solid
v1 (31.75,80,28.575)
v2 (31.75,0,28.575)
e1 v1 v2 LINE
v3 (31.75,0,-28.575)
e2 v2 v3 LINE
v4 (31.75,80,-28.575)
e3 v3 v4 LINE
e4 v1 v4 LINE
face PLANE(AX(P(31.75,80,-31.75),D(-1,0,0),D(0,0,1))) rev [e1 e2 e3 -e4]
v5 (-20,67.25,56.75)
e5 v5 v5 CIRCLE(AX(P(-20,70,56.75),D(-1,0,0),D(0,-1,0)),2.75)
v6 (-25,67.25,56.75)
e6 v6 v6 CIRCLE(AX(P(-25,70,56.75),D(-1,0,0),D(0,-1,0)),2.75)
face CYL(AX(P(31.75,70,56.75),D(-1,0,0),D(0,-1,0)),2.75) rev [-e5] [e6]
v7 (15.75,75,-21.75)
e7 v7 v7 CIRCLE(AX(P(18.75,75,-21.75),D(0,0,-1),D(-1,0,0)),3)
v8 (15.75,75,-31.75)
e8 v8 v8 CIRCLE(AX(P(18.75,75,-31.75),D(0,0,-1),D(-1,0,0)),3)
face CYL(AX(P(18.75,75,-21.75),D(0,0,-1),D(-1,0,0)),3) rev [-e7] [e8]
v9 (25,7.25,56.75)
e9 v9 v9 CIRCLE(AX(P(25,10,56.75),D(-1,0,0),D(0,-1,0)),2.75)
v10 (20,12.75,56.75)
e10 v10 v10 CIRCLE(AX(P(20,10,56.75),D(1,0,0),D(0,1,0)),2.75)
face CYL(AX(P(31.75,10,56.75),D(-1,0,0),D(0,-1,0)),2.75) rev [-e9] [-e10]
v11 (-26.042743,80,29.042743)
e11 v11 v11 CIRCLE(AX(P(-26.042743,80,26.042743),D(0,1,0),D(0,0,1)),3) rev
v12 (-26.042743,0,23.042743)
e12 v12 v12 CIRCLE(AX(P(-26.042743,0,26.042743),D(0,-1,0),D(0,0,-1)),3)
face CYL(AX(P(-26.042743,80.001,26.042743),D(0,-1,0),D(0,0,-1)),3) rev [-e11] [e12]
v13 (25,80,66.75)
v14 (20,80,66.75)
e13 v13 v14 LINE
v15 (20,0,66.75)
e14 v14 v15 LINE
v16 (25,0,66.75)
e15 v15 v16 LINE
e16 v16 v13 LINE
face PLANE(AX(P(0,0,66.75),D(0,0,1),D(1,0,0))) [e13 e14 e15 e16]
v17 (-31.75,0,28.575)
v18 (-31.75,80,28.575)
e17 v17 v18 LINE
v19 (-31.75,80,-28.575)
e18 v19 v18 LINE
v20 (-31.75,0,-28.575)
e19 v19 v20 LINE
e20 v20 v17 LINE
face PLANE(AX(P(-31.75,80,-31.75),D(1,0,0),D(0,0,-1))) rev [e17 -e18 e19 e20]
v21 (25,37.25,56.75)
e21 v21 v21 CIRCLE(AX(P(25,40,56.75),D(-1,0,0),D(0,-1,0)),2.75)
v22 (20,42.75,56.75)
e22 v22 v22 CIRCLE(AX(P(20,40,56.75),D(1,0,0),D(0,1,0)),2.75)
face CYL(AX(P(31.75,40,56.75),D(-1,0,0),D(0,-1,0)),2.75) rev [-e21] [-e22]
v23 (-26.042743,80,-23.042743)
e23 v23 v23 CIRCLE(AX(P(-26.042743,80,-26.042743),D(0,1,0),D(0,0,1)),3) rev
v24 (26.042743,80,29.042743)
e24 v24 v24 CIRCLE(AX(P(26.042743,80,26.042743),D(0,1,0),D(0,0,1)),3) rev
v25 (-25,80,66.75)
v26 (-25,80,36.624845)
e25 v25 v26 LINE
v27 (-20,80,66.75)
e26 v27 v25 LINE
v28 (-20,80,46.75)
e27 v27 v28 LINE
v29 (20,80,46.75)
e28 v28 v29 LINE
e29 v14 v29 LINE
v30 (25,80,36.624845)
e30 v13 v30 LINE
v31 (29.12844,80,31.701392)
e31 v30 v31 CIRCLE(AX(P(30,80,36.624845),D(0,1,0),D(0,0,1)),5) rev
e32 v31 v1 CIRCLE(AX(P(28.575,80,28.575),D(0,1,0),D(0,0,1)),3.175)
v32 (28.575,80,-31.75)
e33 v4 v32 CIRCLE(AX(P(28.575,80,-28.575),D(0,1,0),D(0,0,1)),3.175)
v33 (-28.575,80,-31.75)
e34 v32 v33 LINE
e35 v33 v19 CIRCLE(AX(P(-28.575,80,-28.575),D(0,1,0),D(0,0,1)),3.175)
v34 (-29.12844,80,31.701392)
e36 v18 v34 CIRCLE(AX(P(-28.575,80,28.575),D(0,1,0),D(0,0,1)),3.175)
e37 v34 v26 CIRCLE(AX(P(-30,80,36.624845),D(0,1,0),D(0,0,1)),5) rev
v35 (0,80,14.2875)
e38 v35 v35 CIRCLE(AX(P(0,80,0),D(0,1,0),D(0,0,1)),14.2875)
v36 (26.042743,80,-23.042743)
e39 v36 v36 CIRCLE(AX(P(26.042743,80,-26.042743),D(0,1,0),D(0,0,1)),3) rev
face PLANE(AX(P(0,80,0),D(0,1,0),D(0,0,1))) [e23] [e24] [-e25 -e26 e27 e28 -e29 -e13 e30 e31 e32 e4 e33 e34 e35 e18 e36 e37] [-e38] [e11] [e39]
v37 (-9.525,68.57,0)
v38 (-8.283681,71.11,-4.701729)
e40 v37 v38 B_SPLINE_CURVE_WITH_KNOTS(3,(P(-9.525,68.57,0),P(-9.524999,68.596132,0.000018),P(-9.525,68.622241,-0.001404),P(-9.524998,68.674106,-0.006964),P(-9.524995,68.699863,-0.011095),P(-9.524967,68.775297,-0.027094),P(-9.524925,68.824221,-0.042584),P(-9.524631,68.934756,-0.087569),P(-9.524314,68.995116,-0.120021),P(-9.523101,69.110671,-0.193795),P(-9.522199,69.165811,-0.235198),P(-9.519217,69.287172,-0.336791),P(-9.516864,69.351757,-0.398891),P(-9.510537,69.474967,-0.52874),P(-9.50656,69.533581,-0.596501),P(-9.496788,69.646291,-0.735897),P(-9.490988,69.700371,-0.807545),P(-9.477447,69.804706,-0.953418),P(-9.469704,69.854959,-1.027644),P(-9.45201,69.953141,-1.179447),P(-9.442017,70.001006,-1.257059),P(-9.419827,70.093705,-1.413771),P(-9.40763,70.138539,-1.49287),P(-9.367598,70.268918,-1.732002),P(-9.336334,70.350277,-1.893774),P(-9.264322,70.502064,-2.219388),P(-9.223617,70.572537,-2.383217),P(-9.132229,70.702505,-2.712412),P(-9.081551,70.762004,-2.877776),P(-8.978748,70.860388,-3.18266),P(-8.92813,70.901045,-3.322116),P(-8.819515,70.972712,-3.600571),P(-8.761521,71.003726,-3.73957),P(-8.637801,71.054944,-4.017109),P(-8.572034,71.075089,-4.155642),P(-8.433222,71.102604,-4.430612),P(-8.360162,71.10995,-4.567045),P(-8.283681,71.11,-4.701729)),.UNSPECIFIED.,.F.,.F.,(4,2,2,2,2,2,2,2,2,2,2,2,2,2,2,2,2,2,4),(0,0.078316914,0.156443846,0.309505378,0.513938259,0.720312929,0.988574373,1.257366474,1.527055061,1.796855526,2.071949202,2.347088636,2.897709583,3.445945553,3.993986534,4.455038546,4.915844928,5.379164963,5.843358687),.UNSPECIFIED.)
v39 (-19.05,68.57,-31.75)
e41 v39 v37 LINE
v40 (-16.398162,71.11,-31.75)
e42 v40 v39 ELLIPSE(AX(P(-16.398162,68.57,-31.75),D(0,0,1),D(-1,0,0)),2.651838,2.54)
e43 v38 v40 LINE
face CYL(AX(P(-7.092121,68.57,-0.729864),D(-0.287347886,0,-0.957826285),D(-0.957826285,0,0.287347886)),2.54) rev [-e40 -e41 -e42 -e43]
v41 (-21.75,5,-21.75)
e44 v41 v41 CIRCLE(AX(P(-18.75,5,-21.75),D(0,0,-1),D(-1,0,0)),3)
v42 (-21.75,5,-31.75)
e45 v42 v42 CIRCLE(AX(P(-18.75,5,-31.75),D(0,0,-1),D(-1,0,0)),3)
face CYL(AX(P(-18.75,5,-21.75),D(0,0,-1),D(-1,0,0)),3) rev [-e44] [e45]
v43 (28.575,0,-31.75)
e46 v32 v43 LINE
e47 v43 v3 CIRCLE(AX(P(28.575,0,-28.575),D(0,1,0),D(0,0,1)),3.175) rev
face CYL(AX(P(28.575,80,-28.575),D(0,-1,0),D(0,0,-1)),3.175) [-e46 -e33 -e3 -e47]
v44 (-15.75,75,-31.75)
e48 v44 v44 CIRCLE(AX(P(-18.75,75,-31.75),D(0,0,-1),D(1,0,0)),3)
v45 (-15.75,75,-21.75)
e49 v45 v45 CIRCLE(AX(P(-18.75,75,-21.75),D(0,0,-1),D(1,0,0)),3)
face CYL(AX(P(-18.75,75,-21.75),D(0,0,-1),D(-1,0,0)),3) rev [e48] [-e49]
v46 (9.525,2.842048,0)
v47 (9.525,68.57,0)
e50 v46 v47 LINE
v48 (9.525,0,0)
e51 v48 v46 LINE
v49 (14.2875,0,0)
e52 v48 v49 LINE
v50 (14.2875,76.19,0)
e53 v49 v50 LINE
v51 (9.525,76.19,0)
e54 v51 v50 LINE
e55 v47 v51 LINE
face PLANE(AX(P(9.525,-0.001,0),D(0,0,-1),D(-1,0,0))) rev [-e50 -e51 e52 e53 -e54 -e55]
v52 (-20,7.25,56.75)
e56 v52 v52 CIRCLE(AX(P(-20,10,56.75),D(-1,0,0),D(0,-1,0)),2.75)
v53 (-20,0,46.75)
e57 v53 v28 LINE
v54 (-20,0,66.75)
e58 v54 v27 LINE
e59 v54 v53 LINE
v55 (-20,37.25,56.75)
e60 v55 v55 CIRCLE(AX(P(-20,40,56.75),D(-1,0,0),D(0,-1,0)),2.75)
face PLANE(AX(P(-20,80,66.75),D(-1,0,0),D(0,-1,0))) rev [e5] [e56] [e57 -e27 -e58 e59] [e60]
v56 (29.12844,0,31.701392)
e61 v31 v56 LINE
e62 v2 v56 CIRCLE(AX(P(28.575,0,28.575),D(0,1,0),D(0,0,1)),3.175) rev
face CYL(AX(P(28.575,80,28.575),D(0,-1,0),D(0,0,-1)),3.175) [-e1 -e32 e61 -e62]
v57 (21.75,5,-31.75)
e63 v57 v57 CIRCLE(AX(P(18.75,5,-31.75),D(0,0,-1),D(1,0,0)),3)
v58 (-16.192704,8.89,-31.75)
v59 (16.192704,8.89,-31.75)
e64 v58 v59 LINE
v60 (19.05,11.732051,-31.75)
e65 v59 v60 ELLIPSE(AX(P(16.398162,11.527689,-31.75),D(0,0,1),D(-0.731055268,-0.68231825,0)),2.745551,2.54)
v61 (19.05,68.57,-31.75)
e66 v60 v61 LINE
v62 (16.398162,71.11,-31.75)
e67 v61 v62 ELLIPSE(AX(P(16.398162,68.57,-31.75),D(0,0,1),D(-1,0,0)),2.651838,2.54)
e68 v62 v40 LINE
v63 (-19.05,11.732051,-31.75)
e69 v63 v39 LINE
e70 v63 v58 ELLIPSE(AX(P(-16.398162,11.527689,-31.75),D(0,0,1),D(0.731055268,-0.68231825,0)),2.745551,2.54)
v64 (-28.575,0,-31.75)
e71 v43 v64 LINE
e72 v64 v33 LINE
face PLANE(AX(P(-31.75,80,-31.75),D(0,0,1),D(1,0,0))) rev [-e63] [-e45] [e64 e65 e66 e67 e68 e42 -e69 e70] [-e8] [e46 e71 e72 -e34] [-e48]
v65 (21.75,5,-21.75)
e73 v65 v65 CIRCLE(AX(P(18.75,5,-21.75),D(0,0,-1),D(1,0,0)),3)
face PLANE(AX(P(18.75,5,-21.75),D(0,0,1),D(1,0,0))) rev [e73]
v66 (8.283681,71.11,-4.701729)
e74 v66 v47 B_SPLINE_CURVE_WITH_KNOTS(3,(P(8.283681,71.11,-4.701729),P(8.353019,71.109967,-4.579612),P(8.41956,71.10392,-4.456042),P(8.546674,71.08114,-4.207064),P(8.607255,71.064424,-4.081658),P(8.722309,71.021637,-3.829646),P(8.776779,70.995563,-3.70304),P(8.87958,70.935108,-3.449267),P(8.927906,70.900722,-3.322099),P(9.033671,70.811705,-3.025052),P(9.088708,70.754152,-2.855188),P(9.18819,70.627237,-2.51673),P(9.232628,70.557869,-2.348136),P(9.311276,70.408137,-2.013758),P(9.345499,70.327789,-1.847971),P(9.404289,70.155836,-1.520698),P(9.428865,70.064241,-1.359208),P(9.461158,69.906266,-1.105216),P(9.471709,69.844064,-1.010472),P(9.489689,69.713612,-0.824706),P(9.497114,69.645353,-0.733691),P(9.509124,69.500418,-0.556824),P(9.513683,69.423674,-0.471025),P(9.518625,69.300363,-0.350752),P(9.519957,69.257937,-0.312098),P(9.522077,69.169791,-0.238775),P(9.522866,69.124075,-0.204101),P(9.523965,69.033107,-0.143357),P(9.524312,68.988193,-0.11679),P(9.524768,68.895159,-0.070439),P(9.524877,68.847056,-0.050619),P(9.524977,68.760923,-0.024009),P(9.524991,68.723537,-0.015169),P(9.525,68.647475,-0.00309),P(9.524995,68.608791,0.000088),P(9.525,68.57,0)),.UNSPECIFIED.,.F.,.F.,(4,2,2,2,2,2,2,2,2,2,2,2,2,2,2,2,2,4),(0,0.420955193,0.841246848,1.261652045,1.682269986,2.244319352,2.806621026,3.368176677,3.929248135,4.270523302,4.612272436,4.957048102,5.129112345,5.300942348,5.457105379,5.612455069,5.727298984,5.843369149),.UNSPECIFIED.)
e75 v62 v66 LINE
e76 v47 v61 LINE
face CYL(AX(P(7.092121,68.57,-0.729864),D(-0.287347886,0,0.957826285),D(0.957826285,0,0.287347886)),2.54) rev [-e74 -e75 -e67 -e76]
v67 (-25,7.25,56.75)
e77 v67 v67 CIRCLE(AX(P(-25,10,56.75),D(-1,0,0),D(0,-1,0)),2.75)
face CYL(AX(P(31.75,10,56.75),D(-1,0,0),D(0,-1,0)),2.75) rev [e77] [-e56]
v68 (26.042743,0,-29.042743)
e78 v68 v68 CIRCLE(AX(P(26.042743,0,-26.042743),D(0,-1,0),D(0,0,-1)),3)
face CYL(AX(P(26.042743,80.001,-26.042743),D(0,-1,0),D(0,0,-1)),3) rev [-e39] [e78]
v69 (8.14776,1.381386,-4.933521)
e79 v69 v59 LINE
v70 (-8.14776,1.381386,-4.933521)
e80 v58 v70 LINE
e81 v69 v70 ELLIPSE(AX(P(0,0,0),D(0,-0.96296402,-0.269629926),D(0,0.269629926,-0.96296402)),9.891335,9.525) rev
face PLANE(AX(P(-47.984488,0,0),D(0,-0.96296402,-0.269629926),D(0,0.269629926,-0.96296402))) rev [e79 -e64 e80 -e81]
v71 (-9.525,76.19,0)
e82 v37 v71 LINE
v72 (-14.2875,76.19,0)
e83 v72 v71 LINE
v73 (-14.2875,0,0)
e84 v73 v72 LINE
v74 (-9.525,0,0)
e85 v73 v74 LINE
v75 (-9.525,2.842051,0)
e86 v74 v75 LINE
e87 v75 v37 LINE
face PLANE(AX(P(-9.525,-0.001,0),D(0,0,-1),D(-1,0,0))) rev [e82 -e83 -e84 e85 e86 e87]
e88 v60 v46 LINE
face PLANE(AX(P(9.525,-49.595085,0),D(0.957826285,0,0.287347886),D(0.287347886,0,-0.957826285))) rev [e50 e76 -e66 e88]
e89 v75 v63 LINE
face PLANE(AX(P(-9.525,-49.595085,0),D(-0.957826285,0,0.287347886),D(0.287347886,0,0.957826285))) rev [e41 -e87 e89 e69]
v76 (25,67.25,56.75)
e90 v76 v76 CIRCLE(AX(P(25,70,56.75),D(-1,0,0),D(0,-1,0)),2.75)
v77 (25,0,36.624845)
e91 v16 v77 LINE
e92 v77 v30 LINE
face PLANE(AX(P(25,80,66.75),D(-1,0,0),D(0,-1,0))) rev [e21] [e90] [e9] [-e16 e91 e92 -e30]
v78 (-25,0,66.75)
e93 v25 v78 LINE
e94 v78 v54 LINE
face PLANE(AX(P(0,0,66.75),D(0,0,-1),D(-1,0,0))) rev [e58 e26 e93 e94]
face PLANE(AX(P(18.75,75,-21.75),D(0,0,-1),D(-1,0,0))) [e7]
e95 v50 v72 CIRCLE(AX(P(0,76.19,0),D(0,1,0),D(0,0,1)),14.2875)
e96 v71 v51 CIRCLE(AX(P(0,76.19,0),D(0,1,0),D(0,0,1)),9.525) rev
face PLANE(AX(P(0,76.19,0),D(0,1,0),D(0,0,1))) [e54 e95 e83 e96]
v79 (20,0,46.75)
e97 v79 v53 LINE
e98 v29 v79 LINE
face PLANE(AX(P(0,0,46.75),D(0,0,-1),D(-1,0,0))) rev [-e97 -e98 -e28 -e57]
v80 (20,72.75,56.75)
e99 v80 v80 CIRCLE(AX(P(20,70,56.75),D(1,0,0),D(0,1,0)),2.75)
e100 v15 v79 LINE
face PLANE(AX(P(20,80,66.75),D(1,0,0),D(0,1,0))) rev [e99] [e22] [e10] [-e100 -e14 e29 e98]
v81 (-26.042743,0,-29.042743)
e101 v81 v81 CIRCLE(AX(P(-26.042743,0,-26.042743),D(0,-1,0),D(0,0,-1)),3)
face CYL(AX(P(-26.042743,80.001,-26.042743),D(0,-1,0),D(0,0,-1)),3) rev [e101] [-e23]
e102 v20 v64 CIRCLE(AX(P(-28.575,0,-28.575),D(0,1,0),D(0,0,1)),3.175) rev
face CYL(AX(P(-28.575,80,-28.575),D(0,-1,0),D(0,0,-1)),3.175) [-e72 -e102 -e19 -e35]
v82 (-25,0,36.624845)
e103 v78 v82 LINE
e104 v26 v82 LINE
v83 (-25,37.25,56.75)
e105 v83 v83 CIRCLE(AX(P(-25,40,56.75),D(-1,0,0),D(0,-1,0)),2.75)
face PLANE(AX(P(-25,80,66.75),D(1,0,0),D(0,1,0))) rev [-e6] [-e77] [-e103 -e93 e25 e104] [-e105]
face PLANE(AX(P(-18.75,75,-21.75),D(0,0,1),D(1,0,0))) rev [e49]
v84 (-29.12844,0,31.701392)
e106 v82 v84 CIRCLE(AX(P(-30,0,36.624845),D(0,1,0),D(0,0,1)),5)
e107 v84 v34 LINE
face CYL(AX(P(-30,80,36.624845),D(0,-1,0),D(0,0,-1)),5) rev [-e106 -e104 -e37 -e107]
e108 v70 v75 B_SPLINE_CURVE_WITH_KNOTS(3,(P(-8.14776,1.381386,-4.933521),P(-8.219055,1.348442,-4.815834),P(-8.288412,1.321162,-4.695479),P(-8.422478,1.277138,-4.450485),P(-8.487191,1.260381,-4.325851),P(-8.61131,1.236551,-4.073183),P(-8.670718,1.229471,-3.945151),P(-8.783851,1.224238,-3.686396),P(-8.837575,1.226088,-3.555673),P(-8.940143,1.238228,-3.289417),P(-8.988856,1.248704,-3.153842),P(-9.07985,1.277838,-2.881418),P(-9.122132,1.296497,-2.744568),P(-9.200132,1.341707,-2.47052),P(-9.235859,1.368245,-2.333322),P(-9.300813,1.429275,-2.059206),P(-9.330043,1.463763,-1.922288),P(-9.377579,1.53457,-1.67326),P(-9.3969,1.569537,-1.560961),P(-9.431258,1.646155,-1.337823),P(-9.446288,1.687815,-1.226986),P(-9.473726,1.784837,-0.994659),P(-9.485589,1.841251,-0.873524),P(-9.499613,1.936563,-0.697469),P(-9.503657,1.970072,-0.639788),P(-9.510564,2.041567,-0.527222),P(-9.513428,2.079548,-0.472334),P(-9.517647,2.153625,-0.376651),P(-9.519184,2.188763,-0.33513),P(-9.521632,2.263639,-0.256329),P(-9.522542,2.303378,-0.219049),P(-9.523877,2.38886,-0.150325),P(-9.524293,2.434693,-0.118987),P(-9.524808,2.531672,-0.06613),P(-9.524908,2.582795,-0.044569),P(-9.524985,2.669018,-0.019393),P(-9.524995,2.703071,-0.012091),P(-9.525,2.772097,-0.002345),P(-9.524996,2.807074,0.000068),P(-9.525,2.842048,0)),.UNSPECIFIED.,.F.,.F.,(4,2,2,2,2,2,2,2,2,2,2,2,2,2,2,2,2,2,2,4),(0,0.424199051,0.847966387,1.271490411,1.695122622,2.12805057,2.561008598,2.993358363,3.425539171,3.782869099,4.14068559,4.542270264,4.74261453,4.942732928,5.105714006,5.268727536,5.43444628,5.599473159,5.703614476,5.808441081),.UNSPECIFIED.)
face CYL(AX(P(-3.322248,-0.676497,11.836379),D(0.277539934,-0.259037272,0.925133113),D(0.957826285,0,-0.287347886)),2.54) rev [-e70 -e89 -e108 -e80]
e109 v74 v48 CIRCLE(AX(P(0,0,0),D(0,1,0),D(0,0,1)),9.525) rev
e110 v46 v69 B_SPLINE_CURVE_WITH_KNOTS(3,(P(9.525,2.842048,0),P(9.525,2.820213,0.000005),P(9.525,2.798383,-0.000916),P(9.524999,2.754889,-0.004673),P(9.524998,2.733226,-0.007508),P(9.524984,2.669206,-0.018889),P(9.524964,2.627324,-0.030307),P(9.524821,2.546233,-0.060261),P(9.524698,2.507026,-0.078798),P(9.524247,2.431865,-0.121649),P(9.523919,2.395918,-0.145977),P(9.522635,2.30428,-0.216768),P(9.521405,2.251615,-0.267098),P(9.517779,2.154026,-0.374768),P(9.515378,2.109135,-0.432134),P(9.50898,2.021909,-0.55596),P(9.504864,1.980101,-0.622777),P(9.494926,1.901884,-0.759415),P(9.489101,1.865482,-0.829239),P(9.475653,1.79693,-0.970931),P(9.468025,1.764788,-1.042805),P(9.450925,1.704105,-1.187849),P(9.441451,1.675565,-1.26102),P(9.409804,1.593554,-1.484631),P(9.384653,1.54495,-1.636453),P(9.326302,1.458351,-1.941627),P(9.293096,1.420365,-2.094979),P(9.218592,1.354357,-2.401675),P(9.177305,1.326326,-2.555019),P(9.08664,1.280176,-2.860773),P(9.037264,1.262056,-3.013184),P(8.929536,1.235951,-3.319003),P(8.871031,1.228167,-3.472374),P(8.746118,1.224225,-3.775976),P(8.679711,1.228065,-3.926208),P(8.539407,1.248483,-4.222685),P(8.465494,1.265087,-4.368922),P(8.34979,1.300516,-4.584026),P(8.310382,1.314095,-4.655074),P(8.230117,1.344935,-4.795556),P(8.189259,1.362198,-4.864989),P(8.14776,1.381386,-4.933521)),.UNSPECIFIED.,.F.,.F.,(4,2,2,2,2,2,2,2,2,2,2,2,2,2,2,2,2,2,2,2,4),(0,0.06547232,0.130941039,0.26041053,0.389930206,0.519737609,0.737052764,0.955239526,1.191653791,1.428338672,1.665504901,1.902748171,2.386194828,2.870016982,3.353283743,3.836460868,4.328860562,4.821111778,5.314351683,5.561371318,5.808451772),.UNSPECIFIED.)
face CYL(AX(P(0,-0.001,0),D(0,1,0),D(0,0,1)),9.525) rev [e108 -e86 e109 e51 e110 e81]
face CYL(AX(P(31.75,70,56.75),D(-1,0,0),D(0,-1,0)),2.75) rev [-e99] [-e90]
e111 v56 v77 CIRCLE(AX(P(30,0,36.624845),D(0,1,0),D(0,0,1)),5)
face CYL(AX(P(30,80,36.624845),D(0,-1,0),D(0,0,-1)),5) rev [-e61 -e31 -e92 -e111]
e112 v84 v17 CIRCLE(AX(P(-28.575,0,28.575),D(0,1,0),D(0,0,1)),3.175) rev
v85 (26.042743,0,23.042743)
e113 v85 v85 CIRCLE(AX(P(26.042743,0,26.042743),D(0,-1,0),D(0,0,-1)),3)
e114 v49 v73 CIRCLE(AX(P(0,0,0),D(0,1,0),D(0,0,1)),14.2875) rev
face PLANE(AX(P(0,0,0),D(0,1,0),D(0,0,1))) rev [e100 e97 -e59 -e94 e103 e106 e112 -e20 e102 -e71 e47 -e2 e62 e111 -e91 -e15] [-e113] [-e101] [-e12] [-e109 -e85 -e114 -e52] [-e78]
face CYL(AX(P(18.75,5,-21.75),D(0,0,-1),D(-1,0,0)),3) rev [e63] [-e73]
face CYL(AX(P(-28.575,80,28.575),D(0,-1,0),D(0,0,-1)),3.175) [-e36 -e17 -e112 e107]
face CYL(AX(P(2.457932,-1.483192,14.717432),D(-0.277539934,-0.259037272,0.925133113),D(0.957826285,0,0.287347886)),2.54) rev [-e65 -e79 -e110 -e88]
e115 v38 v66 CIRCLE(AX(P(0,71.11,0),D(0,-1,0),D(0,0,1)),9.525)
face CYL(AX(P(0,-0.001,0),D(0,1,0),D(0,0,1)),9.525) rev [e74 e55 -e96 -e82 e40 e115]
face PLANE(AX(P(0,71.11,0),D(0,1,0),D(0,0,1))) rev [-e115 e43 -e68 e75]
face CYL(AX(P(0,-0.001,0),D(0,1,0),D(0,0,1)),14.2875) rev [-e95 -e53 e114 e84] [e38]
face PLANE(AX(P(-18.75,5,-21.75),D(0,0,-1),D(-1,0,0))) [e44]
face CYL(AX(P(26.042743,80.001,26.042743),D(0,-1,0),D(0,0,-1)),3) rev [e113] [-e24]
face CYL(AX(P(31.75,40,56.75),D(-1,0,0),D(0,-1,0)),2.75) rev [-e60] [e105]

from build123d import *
from build123d.topology import SkipClean

# Parameters (mm, degrees)
SKETCH2_W                      = 63.5
SKETCH2_H                      = 63.5
BOSS_EXTRUDE1_DEPTH            = 80
CUT_EXTRUDE1_REACH             = 93.739
SKETCH4_R                      = 14.2875
CUT_EXTRUDE2_DEPTH             = 3.81
CUT_EXTRUDE3_DEPTH             = 62.22
CUT_EXTRUDE4_REACH             = 93.739
CUT_EXTRUDE4_DIRECTION_2_REACH = 93.739
FILLET2_R                      = 2.54
SKETCH9_W                      = 5
SKETCH9_H                      = 80
BOSS_EXTRUDE2_DEPTH            = 35
SKETCH10_R                     = 2.75
CUT_EXTRUDE6_DEPTH             = 119.642846392
CUT_EXTRUDE7_REACH             = 110.92
SKETCH11_R                     = 3
SKETCH12_W                     = 40
SKETCH12_H                     = 80
BOSS_EXTRUDE3_DEPTH            = 15
SKETCH13_R                     = 3
CUT_EXTRUDE8_DEPTH             = 10
FILLET3_R                      = 3.175
FILLET4_DEPTH                  = 80


with BuildPart() as part:
    # Sketch2 → Boss-Extrude1 (new body)
    with BuildSketch(Plane(origin=(0, 0, 0), x_dir=(1, 0, 0), z_dir=(0, 1, 0))):
        Rectangle(SKETCH2_W, SKETCH2_H)
    extrude(amount=BOSS_EXTRUDE1_DEPTH)

    # Sketch3 → Cut-Extrude1 (cut, up to next)
    with BuildSketch(Plane(origin=(0, 80, 0), x_dir=(1, 0, 0), z_dir=(0, 1, 0)), mode=Mode.PRIVATE) as cut_extrude1_sk1:
        with BuildLine():
            Line((9.525, 0), (14.2875, 0))
            ThreePointArc((14.2875, 0), (0, -14.2875), (-14.2875, 0))
            Line((-14.2875, 0), (-9.525, 0))
            ThreePointArc((-9.525, 0), (0, 9.525), (9.525, 0))
        make_face()
    cut_extrude1_tool1 = extrude(cut_extrude1_sk1.sketch, amount=-CUT_EXTRUDE1_REACH, mode=Mode.PRIVATE) & part.part
    add(cut_extrude1_tool1.solids().sort_by_distance((0, 80, 2.954161))[0], mode=Mode.SUBTRACT)

    # Sketch4 → Cut-Extrude2 (cut)
    with BuildSketch(Plane(origin=(0, 80, 0), x_dir=(1, 0, 0), z_dir=(0, 1, 0))):
        with Locations(Location((0, 0, 0), (0, 0, 270))):
            Circle(SKETCH4_R)
    extrude(amount=-CUT_EXTRUDE2_DEPTH, mode=Mode.SUBTRACT)

    # Sketch6 → Cut-Extrude3 (cut)
    with BuildSketch(Plane(origin=(0, 71.11, 0), x_dir=(1, 0, 0), z_dir=(0, 1, 0))):
        with BuildLine():
            Line((9.525, 0), (19.05, 31.75))
            Line((19.05, 31.75), (-19.05, 31.75))
            Line((-19.05, 31.75), (-9.525, 0))
            ThreePointArc((-9.525, 0), (0, 9.525), (9.525, 0))
        make_face()
    extrude(amount=-CUT_EXTRUDE3_DEPTH, mode=Mode.SUBTRACT)

    # Cut-Extrude4: up to this plane
    with SkipClean():  # the faces are left unmerged after this step: merging them gives an invalid solid
        cut_extrude4_end = Plane(origin=(-9.525, -49.595085442, 0), z_dir=(-0.9578262852211514, 0, 0.2873478855663456))
        # Sketch7 → Cut-Extrude4 (cut, up to the surface)
        with BuildSketch(Plane(origin=(0, 0, 0), x_dir=(0, 0, -1), z_dir=(1, 0, 0)), mode=Mode.PRIVATE) as cut_extrude4_sk1:
            Polygon((0, 8.89), (31.75, 8.89), (0, 0), align=None)
        cut_extrude4_tool1 = split(extrude(cut_extrude4_sk1.sketch, amount=-CUT_EXTRUDE4_REACH, mode=Mode.PRIVATE), bisect_by=cut_extrude4_end, keep=Keep.BOTH, mode=Mode.PRIVATE)
        add(cut_extrude4_tool1.solids().sort_by_distance((0, 5.926667, -10.583333))[0], mode=Mode.SUBTRACT)

    # Cut-Extrude4 direction 2: up to this plane
    cut_extrude4_direction_2_end = Plane(origin=(9.525, -49.595085442, 0), z_dir=(0.9578262852211514, 0, 0.2873478855663456))
    # Sketch7 → Cut-Extrude4 direction 2 (cut, up to the surface)
    with BuildSketch(Plane(origin=(0, 0, 0), x_dir=(0, 0, -1), z_dir=(1, 0, 0)), mode=Mode.PRIVATE) as cut_extrude4_direction_2_sk1:
        Polygon((0, 8.89), (31.75, 8.89), (0, 0), align=None)
    cut_extrude4_direction_2_tool1 = split(extrude(cut_extrude4_direction_2_sk1.sketch, amount=CUT_EXTRUDE4_DIRECTION_2_REACH, mode=Mode.PRIVATE), bisect_by=cut_extrude4_direction_2_end, keep=Keep.BOTH, mode=Mode.PRIVATE)
    add(cut_extrude4_direction_2_tool1.solids().sort_by_distance((0, 5.926667, -10.583333))[0], mode=Mode.SUBTRACT)

    # Fillet2
    # the kernel refuses this fillet: 2.54 mm, written as the material it adds along each edge
    with BuildSketch(Plane(origin=(7.700340927, 71.11, 6.082196911), x_dir=(-0.9578262852211513, 0, -0.2873478855663455), z_dir=(0.28734788556634555, 0, -0.9578262852211513))) as fillet2_piece_1_section:
        with BuildLine():
            CenterArc((FILLET2_R, -FILLET2_R), FILLET2_R, 90, 90)
            Line((0, -FILLET2_R), (0, 0))
            Line((0, 0), (FILLET2_R, 0))
        make_face()
    fillet2_piece_1 = extrude(amount=45.847973166, mode=Mode.PRIVATE)
    fillet2_piece_1 = split(fillet2_piece_1, bisect_by=Plane(origin=(7.700340927, 71.11, -31.75), z_dir=(0, 0, 1)), keep=Keep.TOP, mode=Mode.PRIVATE)
    fillet2_piece_1 = fillet2_piece_1 - Plane(origin=(0, 71.11, 0), x_dir=(-1, 0, 0), z_dir=(0, 1, 0)) * Cylinder(9.525, 102, mode=Mode.PRIVATE)
    fillet2_piece_1 = split(fillet2_piece_1, bisect_by=Plane(origin=(7.700340927, 71.11, 0), z_dir=(0, 0, -1)), keep=Keep.TOP, mode=Mode.PRIVATE)
    add(fillet2_piece_1)
    with BuildSketch(Plane(origin=(-20.874659073, 71.11, -37.832196911), x_dir=(0, -1, 0), z_dir=(0.28734788556634555, 0, 0.9578262852211513))) as fillet2_piece_2_section:
        with BuildLine():
            CenterArc((FILLET2_R, FILLET2_R), FILLET2_R, 180, 90)
            Line((0, FILLET2_R), (0, 0))
            Line((0, 0), (FILLET2_R, 0))
        make_face()
    fillet2_piece_2 = extrude(amount=45.847973166, mode=Mode.PRIVATE)
    fillet2_piece_2 = split(fillet2_piece_2, bisect_by=Plane(origin=(-20.874659073, 71.11, -31.75), z_dir=(0, 0, 1)), keep=Keep.TOP, mode=Mode.PRIVATE)
    fillet2_piece_2 = split(fillet2_piece_2, bisect_by=Plane(origin=(-20.874659073, 71.11, 0), z_dir=(0, 0, -1)), keep=Keep.TOP, mode=Mode.PRIVATE)
    fillet2_piece_2 = fillet2_piece_2 - Plane(origin=(0, 71.11, 0), x_dir=(-1, 0, 0), z_dir=(0, 1, 0)) * Cylinder(9.525, 102, mode=Mode.PRIVATE)
    add(fillet2_piece_2)
    with BuildSketch(Plane(origin=(-20.954648619, 10.667672044, -38.098828729), x_dir=(0.9607141016314922, 0.07483307171461691, -0.2672609704093551), z_dir=(0.2775399339309484, -0.2590372716688848, 0.9251331131031606))) as fillet2_piece_3_section:
        with BuildLine():
            CenterArc((FILLET2_R * 1.08072615035, FILLET2_R), FILLET2_R, 175.556407911, 94.443592089)
            Line((FILLET2_R * 0.0837320564804, FILLET2_R * 1.07747758898), (0, 0))
            Line((0, 0), (FILLET2_R * 1.08072615035, 0))
        make_face()
    fillet2_piece_3 = extrude(amount=52.848435405, mode=Mode.PRIVATE)
    fillet2_piece_3 = split(fillet2_piece_3, bisect_by=Plane(origin=(-20.954648619, 10.667672044, -31.75), z_dir=(0, 0, 1)), keep=Keep.TOP, mode=Mode.PRIVATE)
    fillet2_piece_3 = fillet2_piece_3 - Plane(origin=(0, 10.667672044, 0), x_dir=(-1, 0, 0), z_dir=(0, 1, 0)) * Cylinder(9.525, 117, mode=Mode.PRIVATE)
    fillet2_piece_3 = split(fillet2_piece_3, bisect_by=Plane(origin=(-20.954648619, 10.667672044, 0), z_dir=(0, 0, -1)), keep=Keep.TOP, mode=Mode.PRIVATE)
    add(fillet2_piece_3)
    with BuildSketch(Plane(origin=(20.954648619, 10.667672044, -38.098828729), x_dir=(-0.9607141016314922, 0.07483307171461691, -0.2672609704093551), z_dir=(-0.2775399339309484, -0.2590372716688848, 0.9251331131031606))) as fillet2_piece_4_section:
        with BuildLine():
            CenterArc((FILLET2_R * 1.08072615035, -FILLET2_R), FILLET2_R, 90, 94.443592089)
            Line((FILLET2_R * 0.0837320564804, -FILLET2_R * 1.07747758898), (0, 0))
            Line((0, 0), (FILLET2_R * 1.08072615035, 0))
        make_face()
    fillet2_piece_4 = extrude(amount=52.848435405, mode=Mode.PRIVATE)
    fillet2_piece_4 = split(fillet2_piece_4, bisect_by=Plane(origin=(20.954648619, 10.667672044, -31.75), z_dir=(0, 0, 1)), keep=Keep.TOP, mode=Mode.PRIVATE)
    fillet2_piece_4 = fillet2_piece_4 - Plane(origin=(0, 10.667672044, 0), x_dir=(-1, 0, 0), z_dir=(0, 1, 0)) * Cylinder(9.525, 117, mode=Mode.PRIVATE)
    fillet2_piece_4 = split(fillet2_piece_4, bisect_by=Plane(origin=(20.954648619, 10.667672044, 0), z_dir=(0, 0, -1)), keep=Keep.TOP, mode=Mode.PRIVATE)
    add(fillet2_piece_4)

    # Sketch9 → Boss-Extrude2 (add)
    with BuildSketch(Plane.XY.offset(31.75)):
        with Locations((-22.5, 40)):
            Rectangle(SKETCH9_W, SKETCH9_H)
        with Locations((22.5, 40)):
            Rectangle(SKETCH9_W, SKETCH9_H)
    extrude(amount=BOSS_EXTRUDE2_DEPTH)

    # Sketch10 → Cut-Extrude6 (cut, through all)
    with BuildSketch(Plane.ZY.offset(25)):
        with Locations(Location((56.75, 70, 0), (0, 0, 270))):
            Circle(SKETCH10_R)
        with Locations(Location((56.75, 10, 0), (0, 0, 270))):
            Circle(SKETCH10_R)
        with Locations(Location((56.75, 40, 0), (0, 0, 270))):
            Circle(SKETCH10_R)
    extrude(amount=-CUT_EXTRUDE6_DEPTH, mode=Mode.SUBTRACT)

    # Sketch11 → Cut-Extrude7 (cut, up to next)
    with BuildSketch(Plane.XZ, mode=Mode.PRIVATE) as cut_extrude7_sk1:
        with Locations(Location((26.042742751, -26.042742751, 0), (0, 0, 270))):
            Circle(SKETCH11_R)
    cut_extrude7_tool1 = extrude(cut_extrude7_sk1.sketch, amount=-CUT_EXTRUDE7_REACH, mode=Mode.PRIVATE) & part.part
    # Sketch11 → Cut-Extrude7 (cut, up to next)
    with BuildSketch(Plane.XZ, mode=Mode.PRIVATE) as cut_extrude7_sk2:
        with Locations(Location((26.042742751, 26.042742751, 0), (0, 0, 270))):
            Circle(SKETCH11_R)
    cut_extrude7_tool2 = extrude(cut_extrude7_sk2.sketch, amount=-CUT_EXTRUDE7_REACH, mode=Mode.PRIVATE) & part.part
    # Sketch11 → Cut-Extrude7 (cut, up to next)
    with BuildSketch(Plane.XZ, mode=Mode.PRIVATE) as cut_extrude7_sk3:
        with Locations(Location((-26.042742751, -26.042742751, 0), (0, 0, 270))):
            Circle(SKETCH11_R)
    cut_extrude7_tool3 = extrude(cut_extrude7_sk3.sketch, amount=-CUT_EXTRUDE7_REACH, mode=Mode.PRIVATE) & part.part
    # Sketch11 → Cut-Extrude7 (cut, up to next)
    with BuildSketch(Plane.XZ, mode=Mode.PRIVATE) as cut_extrude7_sk4:
        with Locations(Location((-26.042742751, 26.042742751, 0), (0, 0, 270))):
            Circle(SKETCH11_R)
    cut_extrude7_tool4 = extrude(cut_extrude7_sk4.sketch, amount=-CUT_EXTRUDE7_REACH, mode=Mode.PRIVATE) & part.part
    add(cut_extrude7_tool1.solids().sort_by_distance((26.042743, 0, -26.042743))[0], mode=Mode.SUBTRACT)
    add(cut_extrude7_tool2.solids().sort_by_distance((26.042743, 0, 26.042743))[0], mode=Mode.SUBTRACT)
    add(cut_extrude7_tool3.solids().sort_by_distance((-26.042743, 0, -26.042743))[0], mode=Mode.SUBTRACT)
    add(cut_extrude7_tool4.solids().sort_by_distance((-26.042743, 0, 26.042743))[0], mode=Mode.SUBTRACT)

    # Sketch12 → Boss-Extrude3 (add)
    with BuildSketch(Plane.XY.offset(31.75)):
        with Locations((0, 40)):
            Rectangle(SKETCH12_W, SKETCH12_H)
    extrude(amount=BOSS_EXTRUDE3_DEPTH)

    # Sketch13 → Cut-Extrude8 (cut)
    with BuildSketch(Plane(origin=(0, 0, -31.75), x_dir=(-1, 0, 0), z_dir=(0, 0, -1))):
        with Locations((-18.75, 75)):
            Circle(SKETCH13_R)
        with Locations(Location((18.75, 75, 0), (0, 0, 180))):
            Circle(SKETCH13_R)
        with Locations((18.75, 5)):
            Circle(SKETCH13_R)
        with Locations(Location((-18.75, 5, 0), (0, 0, 180))):
            Circle(SKETCH13_R)
    extrude(amount=-CUT_EXTRUDE8_DEPTH, mode=Mode.SUBTRACT)

    # Fillet3
    fillet3_edges = [part.edges().sort_by_distance(p)[0] for p in [
        (31.75, 40, 31.75),
        (-31.75, 40, 31.75),
        (-31.75, 40, -31.75),
        (31.75, 40, -31.75),
    ]]
    fillet(fillet3_edges, radius=FILLET3_R)

    # Fillet4: read off the stored shape, not the designer's step
    # Fillet4 outline → Fillet4 (add)
    with BuildSketch(Plane(origin=(0, 0, 0), x_dir=(1, 0, 0), z_dir=(0, 1, 0))):
        with BuildLine():
            Line((25, -31.75), (25, -36.624844719))
            ThreePointArc((25, -36.624844719), (26.168694859, -33.412197692), (29.128440367, -31.701392291))
            ThreePointArc((29.128440367, -31.701392291), (28.852785416, -31.737824728), (28.575, -31.75))
            Line((28.575, -31.75), (25, -31.75))
        make_face()
        with BuildLine():
            ThreePointArc((-28.575, -31.75), (-28.852785416, -31.737824728), (-29.128440367, -31.701392291))
            ThreePointArc((-29.128440367, -31.701392291), (-26.168694859, -33.412197692), (-25, -36.624844719))
            Line((-25, -36.624844719), (-25, -31.75))
            Line((-25, -31.75), (-28.575, -31.75))
        make_face()
    extrude(amount=FILLET4_DEPTH)


solid = part.part
